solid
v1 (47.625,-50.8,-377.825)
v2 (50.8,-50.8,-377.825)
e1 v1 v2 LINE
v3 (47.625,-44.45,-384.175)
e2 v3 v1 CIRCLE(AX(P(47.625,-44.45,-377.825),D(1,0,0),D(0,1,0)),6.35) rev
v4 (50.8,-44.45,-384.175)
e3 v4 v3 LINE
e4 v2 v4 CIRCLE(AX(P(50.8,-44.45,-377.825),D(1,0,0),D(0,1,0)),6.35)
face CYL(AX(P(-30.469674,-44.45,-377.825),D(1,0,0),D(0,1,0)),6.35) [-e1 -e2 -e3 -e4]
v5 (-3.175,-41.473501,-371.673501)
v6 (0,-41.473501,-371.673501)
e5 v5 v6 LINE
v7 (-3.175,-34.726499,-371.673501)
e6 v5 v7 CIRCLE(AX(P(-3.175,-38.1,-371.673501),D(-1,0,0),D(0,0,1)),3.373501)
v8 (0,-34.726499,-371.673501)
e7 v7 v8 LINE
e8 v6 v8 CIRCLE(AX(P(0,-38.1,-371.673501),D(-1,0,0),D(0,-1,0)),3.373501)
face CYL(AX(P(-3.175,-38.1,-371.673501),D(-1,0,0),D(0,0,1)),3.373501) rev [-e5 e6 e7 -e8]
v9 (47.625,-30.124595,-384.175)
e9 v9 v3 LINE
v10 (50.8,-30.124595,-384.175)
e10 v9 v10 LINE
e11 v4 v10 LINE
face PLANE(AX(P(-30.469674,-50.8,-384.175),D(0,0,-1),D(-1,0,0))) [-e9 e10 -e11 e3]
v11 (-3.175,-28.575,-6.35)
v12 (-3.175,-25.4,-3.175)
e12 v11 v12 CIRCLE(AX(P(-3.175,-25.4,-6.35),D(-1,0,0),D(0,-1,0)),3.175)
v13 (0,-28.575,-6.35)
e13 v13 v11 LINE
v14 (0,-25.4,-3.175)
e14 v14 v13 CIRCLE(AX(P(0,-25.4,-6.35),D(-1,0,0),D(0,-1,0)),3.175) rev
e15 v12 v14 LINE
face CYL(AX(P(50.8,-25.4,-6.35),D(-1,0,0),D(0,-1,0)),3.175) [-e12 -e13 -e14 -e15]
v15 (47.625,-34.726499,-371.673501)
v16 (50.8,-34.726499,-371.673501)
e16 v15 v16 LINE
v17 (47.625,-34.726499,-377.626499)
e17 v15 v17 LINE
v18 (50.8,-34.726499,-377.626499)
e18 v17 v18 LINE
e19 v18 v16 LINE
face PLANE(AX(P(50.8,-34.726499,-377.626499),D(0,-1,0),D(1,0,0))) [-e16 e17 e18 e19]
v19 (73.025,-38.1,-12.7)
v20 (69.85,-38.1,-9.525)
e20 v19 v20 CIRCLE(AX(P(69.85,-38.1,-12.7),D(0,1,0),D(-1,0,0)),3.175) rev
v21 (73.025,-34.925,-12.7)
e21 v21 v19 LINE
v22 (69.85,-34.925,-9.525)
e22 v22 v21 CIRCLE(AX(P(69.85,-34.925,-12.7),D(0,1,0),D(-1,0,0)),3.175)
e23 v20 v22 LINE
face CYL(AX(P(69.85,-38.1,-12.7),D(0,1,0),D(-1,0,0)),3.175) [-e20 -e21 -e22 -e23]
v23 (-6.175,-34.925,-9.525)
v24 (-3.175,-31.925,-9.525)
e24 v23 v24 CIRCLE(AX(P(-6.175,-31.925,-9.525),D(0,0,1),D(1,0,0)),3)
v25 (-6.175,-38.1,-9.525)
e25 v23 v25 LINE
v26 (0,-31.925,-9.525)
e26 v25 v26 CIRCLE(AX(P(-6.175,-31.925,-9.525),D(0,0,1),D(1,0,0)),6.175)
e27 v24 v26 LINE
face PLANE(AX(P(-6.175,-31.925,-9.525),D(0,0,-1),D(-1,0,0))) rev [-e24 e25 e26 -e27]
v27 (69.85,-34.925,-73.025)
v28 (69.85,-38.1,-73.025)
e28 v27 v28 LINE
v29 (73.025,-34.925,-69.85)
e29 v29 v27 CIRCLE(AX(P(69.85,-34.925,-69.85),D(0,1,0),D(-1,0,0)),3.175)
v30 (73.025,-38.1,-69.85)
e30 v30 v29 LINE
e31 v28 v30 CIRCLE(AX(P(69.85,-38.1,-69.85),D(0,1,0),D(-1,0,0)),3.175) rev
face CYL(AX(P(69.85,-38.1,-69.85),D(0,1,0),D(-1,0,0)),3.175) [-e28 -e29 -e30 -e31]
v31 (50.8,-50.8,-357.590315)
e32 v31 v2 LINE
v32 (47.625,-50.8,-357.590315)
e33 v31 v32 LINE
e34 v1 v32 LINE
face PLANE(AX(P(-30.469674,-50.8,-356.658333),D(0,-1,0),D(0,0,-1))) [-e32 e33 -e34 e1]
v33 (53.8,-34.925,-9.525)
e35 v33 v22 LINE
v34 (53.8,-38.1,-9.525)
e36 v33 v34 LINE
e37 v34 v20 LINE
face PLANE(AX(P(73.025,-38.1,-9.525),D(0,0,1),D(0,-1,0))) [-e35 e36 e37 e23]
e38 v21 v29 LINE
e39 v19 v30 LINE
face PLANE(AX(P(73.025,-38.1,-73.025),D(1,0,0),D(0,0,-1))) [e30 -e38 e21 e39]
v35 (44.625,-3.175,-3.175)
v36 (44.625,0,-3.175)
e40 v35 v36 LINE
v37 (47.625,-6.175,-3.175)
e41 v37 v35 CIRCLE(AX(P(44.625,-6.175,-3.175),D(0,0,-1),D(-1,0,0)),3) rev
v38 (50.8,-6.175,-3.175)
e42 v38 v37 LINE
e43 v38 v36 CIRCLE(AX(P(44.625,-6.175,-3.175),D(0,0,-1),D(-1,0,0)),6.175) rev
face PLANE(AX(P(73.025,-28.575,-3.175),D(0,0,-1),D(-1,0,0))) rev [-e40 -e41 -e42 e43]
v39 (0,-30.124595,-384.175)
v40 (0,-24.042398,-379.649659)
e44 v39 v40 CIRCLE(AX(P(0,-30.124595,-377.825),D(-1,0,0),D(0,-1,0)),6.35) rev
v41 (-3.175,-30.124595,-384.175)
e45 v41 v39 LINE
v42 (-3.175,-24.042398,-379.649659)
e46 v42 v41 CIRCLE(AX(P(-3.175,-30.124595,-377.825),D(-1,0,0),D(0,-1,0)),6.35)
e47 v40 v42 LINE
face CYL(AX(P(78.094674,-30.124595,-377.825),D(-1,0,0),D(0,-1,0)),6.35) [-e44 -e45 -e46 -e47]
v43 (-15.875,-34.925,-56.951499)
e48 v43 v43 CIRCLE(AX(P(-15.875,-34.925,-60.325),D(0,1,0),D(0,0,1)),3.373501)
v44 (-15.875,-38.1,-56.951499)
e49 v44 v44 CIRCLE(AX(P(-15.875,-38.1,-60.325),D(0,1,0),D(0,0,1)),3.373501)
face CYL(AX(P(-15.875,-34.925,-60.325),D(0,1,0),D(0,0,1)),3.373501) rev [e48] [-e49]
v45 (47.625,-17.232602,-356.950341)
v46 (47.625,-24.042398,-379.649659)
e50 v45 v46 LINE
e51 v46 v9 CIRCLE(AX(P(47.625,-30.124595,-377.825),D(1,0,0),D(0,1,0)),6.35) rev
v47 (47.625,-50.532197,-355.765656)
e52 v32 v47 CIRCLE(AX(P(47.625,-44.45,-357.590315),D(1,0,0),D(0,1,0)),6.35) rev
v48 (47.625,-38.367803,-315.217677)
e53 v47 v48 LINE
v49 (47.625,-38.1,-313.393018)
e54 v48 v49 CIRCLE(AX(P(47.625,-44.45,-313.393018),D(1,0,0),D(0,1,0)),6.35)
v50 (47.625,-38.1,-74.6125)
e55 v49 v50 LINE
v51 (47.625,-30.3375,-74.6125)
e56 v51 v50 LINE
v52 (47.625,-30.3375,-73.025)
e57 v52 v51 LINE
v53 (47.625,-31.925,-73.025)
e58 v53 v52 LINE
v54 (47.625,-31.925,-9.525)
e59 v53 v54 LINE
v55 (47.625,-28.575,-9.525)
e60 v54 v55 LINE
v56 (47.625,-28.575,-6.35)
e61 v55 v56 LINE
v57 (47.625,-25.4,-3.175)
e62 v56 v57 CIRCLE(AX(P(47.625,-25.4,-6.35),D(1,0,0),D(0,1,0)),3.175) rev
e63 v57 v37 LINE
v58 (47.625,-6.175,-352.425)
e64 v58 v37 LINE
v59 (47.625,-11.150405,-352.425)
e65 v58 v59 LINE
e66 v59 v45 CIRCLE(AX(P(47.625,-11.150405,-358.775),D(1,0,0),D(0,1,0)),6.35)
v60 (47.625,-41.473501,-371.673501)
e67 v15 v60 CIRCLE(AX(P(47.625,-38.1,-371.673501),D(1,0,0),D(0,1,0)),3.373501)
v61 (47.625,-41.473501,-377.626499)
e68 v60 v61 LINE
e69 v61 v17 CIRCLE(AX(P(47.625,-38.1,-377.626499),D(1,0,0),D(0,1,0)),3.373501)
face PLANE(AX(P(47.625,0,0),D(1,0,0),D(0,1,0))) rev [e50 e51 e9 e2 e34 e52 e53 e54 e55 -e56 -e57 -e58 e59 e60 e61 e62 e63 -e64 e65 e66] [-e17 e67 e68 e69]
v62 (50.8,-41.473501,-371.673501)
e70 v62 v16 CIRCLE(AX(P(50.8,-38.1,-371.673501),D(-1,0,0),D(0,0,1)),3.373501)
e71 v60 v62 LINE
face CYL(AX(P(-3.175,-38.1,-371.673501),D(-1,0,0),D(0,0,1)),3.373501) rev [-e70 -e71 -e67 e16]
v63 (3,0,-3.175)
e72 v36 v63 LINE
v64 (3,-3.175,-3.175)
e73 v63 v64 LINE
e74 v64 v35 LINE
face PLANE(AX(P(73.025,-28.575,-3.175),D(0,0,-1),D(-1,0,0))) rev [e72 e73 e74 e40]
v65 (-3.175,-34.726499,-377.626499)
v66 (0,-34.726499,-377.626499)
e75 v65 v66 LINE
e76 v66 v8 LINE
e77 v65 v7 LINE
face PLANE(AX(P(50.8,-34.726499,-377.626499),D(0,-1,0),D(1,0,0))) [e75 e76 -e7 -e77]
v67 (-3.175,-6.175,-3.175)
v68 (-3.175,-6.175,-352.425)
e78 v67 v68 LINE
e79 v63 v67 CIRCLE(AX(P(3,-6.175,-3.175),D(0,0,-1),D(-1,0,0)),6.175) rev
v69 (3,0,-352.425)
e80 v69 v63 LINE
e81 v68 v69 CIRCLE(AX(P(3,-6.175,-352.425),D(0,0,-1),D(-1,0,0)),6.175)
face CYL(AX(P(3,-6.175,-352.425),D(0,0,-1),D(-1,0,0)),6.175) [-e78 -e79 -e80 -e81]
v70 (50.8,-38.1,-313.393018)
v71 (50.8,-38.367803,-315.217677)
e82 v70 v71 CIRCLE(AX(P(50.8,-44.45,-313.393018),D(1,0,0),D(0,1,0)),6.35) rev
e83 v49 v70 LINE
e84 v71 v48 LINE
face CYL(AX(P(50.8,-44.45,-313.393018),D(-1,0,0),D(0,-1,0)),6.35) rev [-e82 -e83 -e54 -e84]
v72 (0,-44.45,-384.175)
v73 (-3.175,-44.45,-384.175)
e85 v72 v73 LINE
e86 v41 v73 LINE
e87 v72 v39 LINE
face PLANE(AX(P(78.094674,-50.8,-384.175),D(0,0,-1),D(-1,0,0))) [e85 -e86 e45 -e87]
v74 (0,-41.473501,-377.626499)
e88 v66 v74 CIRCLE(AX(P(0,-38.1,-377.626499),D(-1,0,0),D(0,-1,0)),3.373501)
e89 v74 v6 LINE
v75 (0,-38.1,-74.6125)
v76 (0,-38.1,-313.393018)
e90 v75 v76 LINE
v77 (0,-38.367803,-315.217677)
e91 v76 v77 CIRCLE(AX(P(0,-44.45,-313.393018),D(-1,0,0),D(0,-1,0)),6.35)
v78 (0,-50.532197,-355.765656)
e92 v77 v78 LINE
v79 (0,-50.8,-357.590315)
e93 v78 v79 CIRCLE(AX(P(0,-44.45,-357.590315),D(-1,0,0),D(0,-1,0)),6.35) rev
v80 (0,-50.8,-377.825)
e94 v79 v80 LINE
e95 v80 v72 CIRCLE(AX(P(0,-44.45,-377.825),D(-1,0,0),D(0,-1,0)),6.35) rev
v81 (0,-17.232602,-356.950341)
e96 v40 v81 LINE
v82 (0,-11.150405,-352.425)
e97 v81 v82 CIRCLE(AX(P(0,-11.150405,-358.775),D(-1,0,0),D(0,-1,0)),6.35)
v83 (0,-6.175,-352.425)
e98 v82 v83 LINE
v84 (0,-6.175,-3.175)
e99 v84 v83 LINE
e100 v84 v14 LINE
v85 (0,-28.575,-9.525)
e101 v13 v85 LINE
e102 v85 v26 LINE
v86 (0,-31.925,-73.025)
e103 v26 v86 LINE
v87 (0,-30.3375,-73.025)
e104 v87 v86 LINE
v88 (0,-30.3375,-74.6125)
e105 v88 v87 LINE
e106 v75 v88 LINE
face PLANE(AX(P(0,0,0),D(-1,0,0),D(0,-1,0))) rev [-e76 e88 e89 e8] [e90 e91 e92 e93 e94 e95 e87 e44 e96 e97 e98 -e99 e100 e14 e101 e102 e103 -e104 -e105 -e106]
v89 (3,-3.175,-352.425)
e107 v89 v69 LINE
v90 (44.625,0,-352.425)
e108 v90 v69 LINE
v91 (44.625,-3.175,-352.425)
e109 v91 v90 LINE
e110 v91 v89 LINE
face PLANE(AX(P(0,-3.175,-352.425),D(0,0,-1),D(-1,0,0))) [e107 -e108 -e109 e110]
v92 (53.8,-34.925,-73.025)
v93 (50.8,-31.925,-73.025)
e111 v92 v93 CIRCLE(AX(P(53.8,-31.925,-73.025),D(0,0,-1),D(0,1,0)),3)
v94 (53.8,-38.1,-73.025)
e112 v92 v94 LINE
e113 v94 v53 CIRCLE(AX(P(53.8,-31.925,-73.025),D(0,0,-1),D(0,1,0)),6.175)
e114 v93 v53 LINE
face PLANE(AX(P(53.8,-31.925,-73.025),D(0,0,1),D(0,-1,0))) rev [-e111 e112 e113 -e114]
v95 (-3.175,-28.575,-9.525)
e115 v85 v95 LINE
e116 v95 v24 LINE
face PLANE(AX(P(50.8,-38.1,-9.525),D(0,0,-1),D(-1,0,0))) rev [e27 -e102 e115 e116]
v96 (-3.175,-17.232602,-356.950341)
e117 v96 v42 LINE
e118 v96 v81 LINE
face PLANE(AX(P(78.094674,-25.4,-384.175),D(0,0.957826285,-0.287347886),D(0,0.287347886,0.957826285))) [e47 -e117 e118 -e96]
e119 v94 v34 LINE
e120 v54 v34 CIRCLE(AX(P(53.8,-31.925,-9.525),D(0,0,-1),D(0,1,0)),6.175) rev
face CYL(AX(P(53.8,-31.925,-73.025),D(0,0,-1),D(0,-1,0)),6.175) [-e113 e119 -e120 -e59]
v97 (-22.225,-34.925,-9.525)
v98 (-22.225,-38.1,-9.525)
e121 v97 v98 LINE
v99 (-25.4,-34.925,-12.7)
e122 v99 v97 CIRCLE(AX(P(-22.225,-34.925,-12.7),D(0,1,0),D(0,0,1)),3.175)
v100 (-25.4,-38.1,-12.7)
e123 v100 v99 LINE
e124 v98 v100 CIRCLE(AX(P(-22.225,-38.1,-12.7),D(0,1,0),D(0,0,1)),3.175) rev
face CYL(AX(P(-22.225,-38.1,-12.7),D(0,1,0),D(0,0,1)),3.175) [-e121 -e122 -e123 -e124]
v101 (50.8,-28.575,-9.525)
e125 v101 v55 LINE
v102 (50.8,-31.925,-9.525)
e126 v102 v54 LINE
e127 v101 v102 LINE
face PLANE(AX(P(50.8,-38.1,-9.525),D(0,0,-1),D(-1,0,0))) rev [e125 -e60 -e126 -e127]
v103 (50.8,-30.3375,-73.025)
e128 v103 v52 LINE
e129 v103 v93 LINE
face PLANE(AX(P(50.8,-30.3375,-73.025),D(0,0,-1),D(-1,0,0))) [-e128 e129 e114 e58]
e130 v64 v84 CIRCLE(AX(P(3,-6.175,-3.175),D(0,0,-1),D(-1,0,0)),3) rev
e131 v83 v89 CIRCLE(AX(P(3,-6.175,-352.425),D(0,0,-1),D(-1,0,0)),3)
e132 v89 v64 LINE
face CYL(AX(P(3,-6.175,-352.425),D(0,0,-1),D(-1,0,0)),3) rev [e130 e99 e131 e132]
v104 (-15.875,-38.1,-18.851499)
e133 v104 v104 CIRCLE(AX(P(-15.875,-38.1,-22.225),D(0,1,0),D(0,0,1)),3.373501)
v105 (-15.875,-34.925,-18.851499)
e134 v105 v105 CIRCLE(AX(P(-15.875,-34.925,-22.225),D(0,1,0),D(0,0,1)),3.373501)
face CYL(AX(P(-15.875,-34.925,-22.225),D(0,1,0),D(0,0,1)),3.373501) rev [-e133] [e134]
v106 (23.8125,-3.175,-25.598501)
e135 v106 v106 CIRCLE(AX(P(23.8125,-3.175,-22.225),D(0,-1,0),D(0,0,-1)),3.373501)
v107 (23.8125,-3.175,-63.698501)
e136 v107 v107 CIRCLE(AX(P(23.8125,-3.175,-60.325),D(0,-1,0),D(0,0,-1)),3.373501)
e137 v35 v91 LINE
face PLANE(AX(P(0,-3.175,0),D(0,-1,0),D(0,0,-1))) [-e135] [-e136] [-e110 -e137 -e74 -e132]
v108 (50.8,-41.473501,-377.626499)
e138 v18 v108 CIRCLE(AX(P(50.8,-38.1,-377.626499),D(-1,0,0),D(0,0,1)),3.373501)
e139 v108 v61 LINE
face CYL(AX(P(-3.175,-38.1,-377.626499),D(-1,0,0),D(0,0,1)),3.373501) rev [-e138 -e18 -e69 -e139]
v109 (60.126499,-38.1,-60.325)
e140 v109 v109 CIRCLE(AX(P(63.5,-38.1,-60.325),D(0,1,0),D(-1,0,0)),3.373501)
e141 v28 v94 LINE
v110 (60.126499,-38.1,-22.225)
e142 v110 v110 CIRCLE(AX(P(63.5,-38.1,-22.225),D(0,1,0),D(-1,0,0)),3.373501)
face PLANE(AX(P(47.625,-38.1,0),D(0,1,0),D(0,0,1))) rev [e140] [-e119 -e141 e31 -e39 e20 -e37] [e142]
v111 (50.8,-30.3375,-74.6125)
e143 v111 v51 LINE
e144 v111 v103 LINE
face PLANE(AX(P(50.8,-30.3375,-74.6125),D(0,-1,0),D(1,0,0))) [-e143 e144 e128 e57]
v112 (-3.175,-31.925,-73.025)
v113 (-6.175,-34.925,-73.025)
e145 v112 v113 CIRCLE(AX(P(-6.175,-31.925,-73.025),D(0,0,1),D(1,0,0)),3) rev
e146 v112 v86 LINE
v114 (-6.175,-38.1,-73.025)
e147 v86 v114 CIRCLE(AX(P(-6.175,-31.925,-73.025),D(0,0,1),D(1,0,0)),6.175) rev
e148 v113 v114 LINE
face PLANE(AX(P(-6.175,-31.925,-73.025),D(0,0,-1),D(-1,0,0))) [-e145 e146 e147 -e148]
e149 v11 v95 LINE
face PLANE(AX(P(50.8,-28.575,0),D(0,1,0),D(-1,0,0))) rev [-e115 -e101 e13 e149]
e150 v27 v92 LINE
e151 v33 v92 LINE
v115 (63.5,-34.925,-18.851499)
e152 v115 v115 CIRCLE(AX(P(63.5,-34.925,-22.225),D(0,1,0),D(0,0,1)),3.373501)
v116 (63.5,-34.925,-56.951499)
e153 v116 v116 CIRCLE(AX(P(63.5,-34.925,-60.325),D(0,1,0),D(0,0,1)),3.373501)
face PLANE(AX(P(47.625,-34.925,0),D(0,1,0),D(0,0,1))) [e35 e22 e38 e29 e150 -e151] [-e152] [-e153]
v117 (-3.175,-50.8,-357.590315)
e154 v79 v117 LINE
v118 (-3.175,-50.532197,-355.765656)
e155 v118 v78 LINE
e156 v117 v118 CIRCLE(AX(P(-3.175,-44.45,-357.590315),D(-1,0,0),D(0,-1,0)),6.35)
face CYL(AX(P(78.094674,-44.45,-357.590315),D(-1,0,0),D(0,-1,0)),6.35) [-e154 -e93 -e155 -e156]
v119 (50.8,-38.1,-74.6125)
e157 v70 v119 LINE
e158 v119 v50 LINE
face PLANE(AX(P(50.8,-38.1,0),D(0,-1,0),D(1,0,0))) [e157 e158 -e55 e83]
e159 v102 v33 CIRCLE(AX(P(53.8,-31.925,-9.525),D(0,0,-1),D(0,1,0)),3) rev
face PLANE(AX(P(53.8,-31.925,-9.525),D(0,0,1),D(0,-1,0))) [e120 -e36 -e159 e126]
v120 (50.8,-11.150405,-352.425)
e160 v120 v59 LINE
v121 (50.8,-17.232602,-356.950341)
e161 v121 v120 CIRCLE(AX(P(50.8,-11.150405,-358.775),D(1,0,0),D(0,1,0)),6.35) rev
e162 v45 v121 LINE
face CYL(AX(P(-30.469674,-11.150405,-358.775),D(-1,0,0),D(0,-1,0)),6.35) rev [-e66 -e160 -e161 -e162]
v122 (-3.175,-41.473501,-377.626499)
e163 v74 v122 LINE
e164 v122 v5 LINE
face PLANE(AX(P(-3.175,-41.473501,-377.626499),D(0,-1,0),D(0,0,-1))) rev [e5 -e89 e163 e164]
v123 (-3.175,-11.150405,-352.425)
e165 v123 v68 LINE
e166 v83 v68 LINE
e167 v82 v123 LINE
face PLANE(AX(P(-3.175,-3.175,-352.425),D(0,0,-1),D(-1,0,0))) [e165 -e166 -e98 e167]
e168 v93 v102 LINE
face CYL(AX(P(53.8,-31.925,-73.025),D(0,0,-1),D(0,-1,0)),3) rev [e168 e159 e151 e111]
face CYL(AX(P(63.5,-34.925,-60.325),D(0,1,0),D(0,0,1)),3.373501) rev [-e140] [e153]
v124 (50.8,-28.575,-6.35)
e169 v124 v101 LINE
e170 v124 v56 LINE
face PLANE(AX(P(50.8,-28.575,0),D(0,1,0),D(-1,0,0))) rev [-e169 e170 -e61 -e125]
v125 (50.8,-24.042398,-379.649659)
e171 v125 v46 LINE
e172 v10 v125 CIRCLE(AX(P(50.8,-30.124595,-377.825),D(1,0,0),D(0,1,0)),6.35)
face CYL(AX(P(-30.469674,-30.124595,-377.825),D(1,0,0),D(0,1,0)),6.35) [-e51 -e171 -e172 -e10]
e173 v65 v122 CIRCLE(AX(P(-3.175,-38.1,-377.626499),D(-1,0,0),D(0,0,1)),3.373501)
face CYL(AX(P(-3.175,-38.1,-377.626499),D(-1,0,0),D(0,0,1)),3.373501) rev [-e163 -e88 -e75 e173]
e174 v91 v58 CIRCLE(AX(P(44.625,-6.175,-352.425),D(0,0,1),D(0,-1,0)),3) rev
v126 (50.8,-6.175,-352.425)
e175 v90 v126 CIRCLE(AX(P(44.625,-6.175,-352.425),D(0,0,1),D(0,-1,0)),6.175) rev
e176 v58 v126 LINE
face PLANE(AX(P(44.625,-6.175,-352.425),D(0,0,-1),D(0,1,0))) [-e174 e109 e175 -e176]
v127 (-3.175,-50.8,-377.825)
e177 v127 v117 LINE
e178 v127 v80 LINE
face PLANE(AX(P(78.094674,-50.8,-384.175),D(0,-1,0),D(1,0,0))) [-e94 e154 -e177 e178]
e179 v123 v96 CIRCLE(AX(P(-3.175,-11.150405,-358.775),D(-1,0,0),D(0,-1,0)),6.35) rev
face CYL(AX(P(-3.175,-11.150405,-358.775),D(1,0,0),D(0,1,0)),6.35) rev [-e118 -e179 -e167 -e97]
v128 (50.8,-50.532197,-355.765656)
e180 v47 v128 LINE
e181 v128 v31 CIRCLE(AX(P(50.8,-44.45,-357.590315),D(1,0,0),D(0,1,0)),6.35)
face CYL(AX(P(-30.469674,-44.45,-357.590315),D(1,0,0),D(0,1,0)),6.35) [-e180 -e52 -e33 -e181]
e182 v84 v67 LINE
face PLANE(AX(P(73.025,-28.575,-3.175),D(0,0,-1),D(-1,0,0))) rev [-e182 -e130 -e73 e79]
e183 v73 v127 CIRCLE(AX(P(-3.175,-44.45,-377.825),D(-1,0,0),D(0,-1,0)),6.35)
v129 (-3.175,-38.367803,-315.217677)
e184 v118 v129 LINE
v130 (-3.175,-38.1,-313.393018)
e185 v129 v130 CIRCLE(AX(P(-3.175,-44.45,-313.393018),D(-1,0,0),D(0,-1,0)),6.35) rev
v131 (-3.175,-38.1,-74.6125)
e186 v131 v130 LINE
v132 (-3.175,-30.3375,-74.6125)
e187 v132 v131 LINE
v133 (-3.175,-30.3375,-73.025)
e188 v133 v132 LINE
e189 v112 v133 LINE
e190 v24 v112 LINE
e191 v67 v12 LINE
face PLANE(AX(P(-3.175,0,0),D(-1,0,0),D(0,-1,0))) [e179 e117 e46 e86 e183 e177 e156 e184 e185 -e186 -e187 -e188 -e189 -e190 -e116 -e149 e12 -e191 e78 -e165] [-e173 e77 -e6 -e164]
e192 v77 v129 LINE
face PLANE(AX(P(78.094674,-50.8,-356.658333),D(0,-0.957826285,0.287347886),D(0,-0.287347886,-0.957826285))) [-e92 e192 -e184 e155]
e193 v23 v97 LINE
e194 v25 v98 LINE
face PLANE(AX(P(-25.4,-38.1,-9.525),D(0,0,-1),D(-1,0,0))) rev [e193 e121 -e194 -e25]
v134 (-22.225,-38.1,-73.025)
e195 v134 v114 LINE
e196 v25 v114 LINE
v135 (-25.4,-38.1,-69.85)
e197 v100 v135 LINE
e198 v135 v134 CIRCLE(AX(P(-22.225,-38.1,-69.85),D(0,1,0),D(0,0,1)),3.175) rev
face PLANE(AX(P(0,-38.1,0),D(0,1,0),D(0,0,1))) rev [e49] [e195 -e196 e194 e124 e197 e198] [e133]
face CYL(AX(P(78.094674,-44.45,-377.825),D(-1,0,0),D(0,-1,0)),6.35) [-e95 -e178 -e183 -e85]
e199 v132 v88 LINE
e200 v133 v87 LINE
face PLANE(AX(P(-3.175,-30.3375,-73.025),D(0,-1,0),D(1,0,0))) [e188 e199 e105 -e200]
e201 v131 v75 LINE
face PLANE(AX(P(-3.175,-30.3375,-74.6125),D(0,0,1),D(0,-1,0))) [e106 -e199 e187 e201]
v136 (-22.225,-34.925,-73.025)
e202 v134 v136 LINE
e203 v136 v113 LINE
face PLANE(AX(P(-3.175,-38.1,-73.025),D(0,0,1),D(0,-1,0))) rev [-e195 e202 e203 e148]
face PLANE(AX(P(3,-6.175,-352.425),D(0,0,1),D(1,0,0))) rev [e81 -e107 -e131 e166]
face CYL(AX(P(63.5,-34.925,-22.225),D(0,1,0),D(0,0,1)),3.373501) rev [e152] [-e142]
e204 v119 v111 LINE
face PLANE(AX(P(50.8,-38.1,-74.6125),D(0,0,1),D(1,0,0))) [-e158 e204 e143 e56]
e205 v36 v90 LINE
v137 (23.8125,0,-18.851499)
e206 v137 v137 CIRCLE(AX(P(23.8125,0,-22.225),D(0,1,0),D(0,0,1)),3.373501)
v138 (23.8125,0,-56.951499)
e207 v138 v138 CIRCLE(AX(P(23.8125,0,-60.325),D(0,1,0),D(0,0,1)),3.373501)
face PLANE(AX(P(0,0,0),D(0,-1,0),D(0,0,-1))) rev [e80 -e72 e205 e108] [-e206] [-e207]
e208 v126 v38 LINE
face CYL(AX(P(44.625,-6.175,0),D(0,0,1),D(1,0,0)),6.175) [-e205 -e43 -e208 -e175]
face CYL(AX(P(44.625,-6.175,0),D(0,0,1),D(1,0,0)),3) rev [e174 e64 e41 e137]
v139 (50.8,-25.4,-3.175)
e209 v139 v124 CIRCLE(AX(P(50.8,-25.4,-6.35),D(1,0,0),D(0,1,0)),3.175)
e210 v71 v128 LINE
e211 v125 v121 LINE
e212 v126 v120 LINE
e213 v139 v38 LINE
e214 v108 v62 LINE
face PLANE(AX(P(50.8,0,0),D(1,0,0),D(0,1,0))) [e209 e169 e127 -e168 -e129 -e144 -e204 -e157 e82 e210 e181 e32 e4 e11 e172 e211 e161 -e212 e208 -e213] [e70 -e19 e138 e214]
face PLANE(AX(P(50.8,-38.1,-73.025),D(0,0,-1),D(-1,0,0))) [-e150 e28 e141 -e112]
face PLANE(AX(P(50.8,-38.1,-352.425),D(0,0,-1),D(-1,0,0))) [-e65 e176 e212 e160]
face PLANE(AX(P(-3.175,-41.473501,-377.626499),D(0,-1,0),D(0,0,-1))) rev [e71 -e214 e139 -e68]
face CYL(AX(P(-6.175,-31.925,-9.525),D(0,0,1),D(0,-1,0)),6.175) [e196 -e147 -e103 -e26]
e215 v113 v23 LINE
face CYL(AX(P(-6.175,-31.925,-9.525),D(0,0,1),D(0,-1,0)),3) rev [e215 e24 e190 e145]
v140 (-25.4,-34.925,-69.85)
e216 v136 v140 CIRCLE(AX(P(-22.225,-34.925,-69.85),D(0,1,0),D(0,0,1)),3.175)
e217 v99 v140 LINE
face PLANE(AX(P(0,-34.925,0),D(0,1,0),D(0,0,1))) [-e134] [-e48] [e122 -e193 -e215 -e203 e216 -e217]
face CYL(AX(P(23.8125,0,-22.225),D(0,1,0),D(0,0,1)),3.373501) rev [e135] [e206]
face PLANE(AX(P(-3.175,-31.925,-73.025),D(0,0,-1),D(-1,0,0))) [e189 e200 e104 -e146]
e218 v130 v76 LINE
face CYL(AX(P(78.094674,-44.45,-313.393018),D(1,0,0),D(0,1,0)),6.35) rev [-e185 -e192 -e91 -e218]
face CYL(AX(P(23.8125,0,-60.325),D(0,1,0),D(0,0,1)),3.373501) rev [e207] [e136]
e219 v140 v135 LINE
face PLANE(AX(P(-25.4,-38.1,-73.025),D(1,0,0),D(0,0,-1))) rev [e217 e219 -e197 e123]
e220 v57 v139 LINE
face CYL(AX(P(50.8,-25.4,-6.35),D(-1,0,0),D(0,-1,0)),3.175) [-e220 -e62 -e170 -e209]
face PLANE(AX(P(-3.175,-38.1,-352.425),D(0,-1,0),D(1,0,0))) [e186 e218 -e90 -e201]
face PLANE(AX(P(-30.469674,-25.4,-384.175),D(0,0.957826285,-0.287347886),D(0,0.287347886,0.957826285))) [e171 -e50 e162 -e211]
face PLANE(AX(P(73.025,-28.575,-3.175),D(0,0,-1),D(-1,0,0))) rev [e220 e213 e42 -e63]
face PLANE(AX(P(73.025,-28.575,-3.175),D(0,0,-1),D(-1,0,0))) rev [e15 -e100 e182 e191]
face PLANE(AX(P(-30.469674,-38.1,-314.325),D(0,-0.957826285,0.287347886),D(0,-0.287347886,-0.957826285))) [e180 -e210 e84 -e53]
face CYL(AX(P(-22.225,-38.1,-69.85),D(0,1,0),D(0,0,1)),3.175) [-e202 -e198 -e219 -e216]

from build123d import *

# Parameters (mm, degrees)
SKETCH1_W                            = 47.625
SKETCH1_H                            = 352.425
BASE_FLANGE1_DEPTH                   = 3.175
EDGE_FLANGE1_STRIP_W                 = 18.7
EDGE_FLANGE1_STRIP_H                 = 3.175
EDGE_FLANGE1_STRIP_CUT_DEPTH         = 352.425
EDGE_FLANGE1_DEPTH                   = 352.425
EDGE_FLANGE2_STRIP_W                 = 18.7
EDGE_FLANGE2_STRIP_H                 = 3.175
EDGE_FLANGE2_STRIP_CUT_DEPTH         = 352.425
EDGE_FLANGE2_DEPTH                   = 352.425
BOSS_EXTRUDE1_DEPTH                  = 3.175
BOSS_EXTRUDE2_DEPTH                  = 3.175
F_17_64_START                        = -3.175
F_17_64_0_26563_DIAMETER_SLOT1_DEPTH = 53.975
F_17_64_0_26563_DIAMETER_HOLE2_D     = 6.747002
SKETCH21_W                           = 9.525
SKETCH21_H                           = 9.525
CUT_EXTRUDE1_DEPTH                   = 392.259979106
EDGE_FLANGE5_STRIP_W                 = 18.7
EDGE_FLANGE5_STRIP_H                 = 3.175
EDGE_FLANGE5_STRIP_CUT_DEPTH         = 63.5
EDGE_FLANGE5_RELIEF_W                = 20.2875
EDGE_FLANGE5_RELIEF_H                = 1.5875
EDGE_FLANGE5_RELIEF_CUT_DEPTH        = 3.175
EDGE_FLANGE5_DEPTH                   = 63.5
FILLET2_R                            = 6.35
F_17_64_0_26563_DIAMETER_HOLE3_D     = 6.747002
FILLET3_R                            = 3.175
CUT_EXTRUDE3_DEPTH                   = 395.939882292
CUT_EXTRUDE3_DEPTH_BACK              = 395.939882292
SKETCH30_W                           = 3.175
SKETCH30_H                           = 28.575
FILLET4_R                            = 3.175


# Read off the part's stored shape, not the designer's step: 17/64 (0.26563) Diameter Slot1
# Sheet-metal steps are written as plain solids
with BuildPart() as part:
    # Sketch1 → Base-Flange1 (new body)
    with BuildSketch(Plane(origin=(0, 0, 0), x_dir=(1, 0, 0), z_dir=(0, 1, 0))):
        with Locations((23.8125, 176.2125)):
            Rectangle(SKETCH1_W, SKETCH1_H)
    extrude(amount=-BASE_FLANGE1_DEPTH)

    # Edge-Flange1 strip (across the edge) → Edge-Flange1 strip cut (cut)
    with BuildSketch(Plane(origin=(47.625, -3.175, -352.425), x_dir=(-1, 0, 0), z_dir=(0, 0, 1))):
        with Locations((-6.35, -1.5875)):
            Rectangle(EDGE_FLANGE1_STRIP_W, EDGE_FLANGE1_STRIP_H)
    extrude(amount=EDGE_FLANGE1_STRIP_CUT_DEPTH, mode=Mode.SUBTRACT)

    # Edge-Flange1 section (across the edge) → Edge-Flange1 (add)
    with BuildSketch(Plane(origin=(47.625, -3.175, -352.425), x_dir=(-1, 0, 0), z_dir=(0, 0, 1))):
        with BuildLine():
            Line((-3.175, 3), (-3.175, 34.925))
            Line((-3.175, 34.925), (0, 34.925))
            Line((0, 34.925), (0, 3))
            ThreePointArc((0, 3), (0.878679656, 0.878679656), (3, 0))
            Line((3, 0), (3, -3.175))
            ThreePointArc((3, -3.175), (-1.366384374, -1.366384374), (-3.175, 3))
        make_face()
    extrude(amount=EDGE_FLANGE1_DEPTH)

    # Edge-Flange2 strip (across the edge) → Edge-Flange2 strip cut (cut)
    with BuildSketch(Plane(origin=(0, -3.175, 0), x_dir=(1, 0, 0), z_dir=(0, 0, -1))):
        with Locations((-6.35, -1.5875)):
            Rectangle(EDGE_FLANGE2_STRIP_W, EDGE_FLANGE2_STRIP_H)
    extrude(amount=EDGE_FLANGE2_STRIP_CUT_DEPTH, mode=Mode.SUBTRACT)

    # Edge-Flange2 section (across the edge) → Edge-Flange2 (add)
    with BuildSketch(Plane(origin=(0, -3.175, 0), x_dir=(1, 0, 0), z_dir=(0, 0, -1))):
        with BuildLine():
            Line((-3.175, 3), (-3.175, 34.925))
            Line((-3.175, 34.925), (0, 34.925))
            Line((0, 34.925), (0, 3))
            ThreePointArc((0, 3), (0.878679656, 0.878679656), (3, 0))
            Line((3, 0), (3, -3.175))
            ThreePointArc((3, -3.175), (-1.366384374, -1.366384374), (-3.175, 3))
        make_face()
    extrude(amount=EDGE_FLANGE2_DEPTH)

    # Sketch12 → Boss-Extrude1 (add)
    with BuildSketch(Plane.ZY.offset(3.175)):
        Polygon((-384.175, -50.8), (-384.175, -25.4), (-352.425, -15.875), (-352.425, -38.1), (-314.325, -38.1), (-356.658333333, -50.8), align=None)
    extrude(amount=-BOSS_EXTRUDE1_DEPTH)

    # Sketch13 → Boss-Extrude2 (add)
    with BuildSketch(Plane(origin=(50.8, 0, 0), x_dir=(0, 0, -1), z_dir=(1, 0, 0))):
        Polygon((352.425, -15.875), (352.425, -38.1), (314.325, -38.1), (356.658333333, -50.8), (384.175, -50.8), (384.175, -25.4), align=None)
    extrude(amount=-BOSS_EXTRUDE2_DEPTH)

    # 17/64 (0.26563) Diameter Slot1 outline → 17/64 (0.26563) Diameter Slot1 (cut)
    with BuildSketch(Plane.YZ.offset(F_17_64_START)):
        with BuildLine():
            ThreePointArc((-41.473501, -377.626499), (-38.1, -381), (-34.726499, -377.626499))
            Line((-34.726499, -377.626499), (-34.726499, -371.673501))
            ThreePointArc((-34.726499, -371.673501), (-38.1, -368.3), (-41.473501, -371.673501))
            Line((-41.473501, -371.673501), (-41.473501, -377.626499))
        make_face()
    extrude(amount=F_17_64_0_26563_DIAMETER_SLOT1_DEPTH, mode=Mode.SUBTRACT)

    # 17/64 (0.26563) Diameter Hole2 (through all)
    with Locations(Plane(origin=(0, 0, 0), x_dir=(1, 0, 0), z_dir=(0, 1, 0))):
        with Locations((23.8125, 22.225), (23.8125, 60.325)):
            Hole(F_17_64_0_26563_DIAMETER_HOLE2_D / 2)

    # Sketch21 → Cut-Extrude1 (cut, through all)
    with BuildSketch(Plane.ZY.offset(3.175)):
        with Locations((-4.7625, -33.3375)):
            Rectangle(SKETCH21_W, SKETCH21_H)
    extrude(amount=-CUT_EXTRUDE1_DEPTH, mode=Mode.SUBTRACT)

    # Edge-Flange5 strip (across the edge) → Edge-Flange5 strip cut (cut)
    with BuildSketch(Plane(origin=(-3.175, -38.1, -73.025), x_dir=(0, 1, 0), z_dir=(0, 0, 1))):
        with Locations((-3.175, -1.5875)):
            Rectangle(EDGE_FLANGE5_STRIP_W, EDGE_FLANGE5_STRIP_H)
    edge_flange5_strip_cut = extrude(amount=EDGE_FLANGE5_STRIP_CUT_DEPTH, mode=Mode.SUBTRACT)

    # Edge-Flange5 relief (on the sheet) → Edge-Flange5 relief cut (cut)
    with BuildSketch(Plane(origin=(-3.175, -31.925, -73.025), x_dir=(0, 1, 0), z_dir=(-1, 0, 0))):
        with Locations((-8.55625, 0.79375)):
            Rectangle(EDGE_FLANGE5_RELIEF_W, EDGE_FLANGE5_RELIEF_H)
    edge_flange5_relief_cut = extrude(amount=-EDGE_FLANGE5_RELIEF_CUT_DEPTH, mode=Mode.SUBTRACT)

    # Edge-Flange5 section (across the edge) → Edge-Flange5 (add)
    with BuildSketch(Plane(origin=(-3.175, -38.1, -73.025), x_dir=(0, 1, 0), z_dir=(0, 0, 1))):
        with BuildLine():
            Line((0, 3), (0, 22.225))
            Line((0, 22.225), (3.175, 22.225))
            Line((3.175, 22.225), (3.175, 3))
            ThreePointArc((3.175, 3), (4.053679656, 0.878679656), (6.175, 0))
            Line((6.175, 0), (6.175, -3.175))
            ThreePointArc((6.175, -3.175), (1.808615626, -1.366384374), (0, 3))
        make_face()
    edge_flange5 = extrude(amount=EDGE_FLANGE5_DEPTH)

    # Fillet2
    fillet2_edges = [part.edges().sort_by_distance(p)[0] for p in [
        (-1.5875, -38.1, -314.325),
        (-1.5875, -50.8, -356.658333333),
        (-1.5875, -50.8, -384.175),
        (-1.5875, -25.4, -384.175),
        (-1.5875, -15.875, -352.425),
        (49.2125, -38.1, -314.325),
        (49.2125, -15.875, -352.425),
        (49.2125, -25.4, -384.175),
        (49.2125, -50.8, -384.175),
        (49.2125, -50.8, -356.658333333),
    ]]
    fillet(fillet2_edges, radius=FILLET2_R)

    # Mirror1: Edge-Flange5 strip cut, Edge-Flange5 relief cut, Edge-Flange5 across plane
    add(edge_flange5_strip_cut.mirror(Plane.ZY.offset(-23.8125)), mode=Mode.SUBTRACT)
    add(edge_flange5_relief_cut.mirror(Plane.ZY.offset(-23.8125)), mode=Mode.SUBTRACT)
    add(edge_flange5.mirror(Plane.ZY.offset(-23.8125)))

    # 17/64 (0.26563) Diameter Hole3 (through all)
    with Locations(Plane(origin=(0, -34.925, 0), x_dir=(1, 0, 0), z_dir=(0, 1, 0))):
        with Locations((-15.875, 60.325), (-15.875, 22.225)):
            f_17_64_0_26563_diameter_hole3 = Hole(F_17_64_0_26563_DIAMETER_HOLE3_D / 2)

    # Mirror2: 17/64 (0.26563) Diameter Hole3 across plane
    add(f_17_64_0_26563_diameter_hole3.mirror(Plane.ZY.offset(-23.8125)), mode=Mode.SUBTRACT)

    # Fillet3
    fillet3_edges = [part.edges().sort_by_distance(p)[0] for p in [
        (-25.4, -36.5125, -73.025),
        (-25.4, -36.5125, -9.525),
        (73.025, -36.5125, -9.525),
        (73.025, -36.5125, -73.025),
    ]]
    fillet(fillet3_edges, radius=FILLET3_R)

    # Sketch30 → Cut-Extrude3 (cut, two sides: drawn at the far end of the back side and taken through both)
    with BuildSketch(Plane.ZY.offset(3.175).offset(-CUT_EXTRUDE3_DEPTH_BACK)):
        with Locations((-1.5875, -14.2875)):
            Rectangle(SKETCH30_W, SKETCH30_H)
    extrude(amount=CUT_EXTRUDE3_DEPTH + CUT_EXTRUDE3_DEPTH_BACK, mode=Mode.SUBTRACT)

    # Fillet4
    fillet4_edges = [part.edges().sort_by_distance(p)[0] for p in [
        (49.2125, -28.575, -3.175),
        (-1.5875, -28.575, -3.175),
    ]]
    fillet(fillet4_edges, radius=FILLET4_R)


solid = part.part
